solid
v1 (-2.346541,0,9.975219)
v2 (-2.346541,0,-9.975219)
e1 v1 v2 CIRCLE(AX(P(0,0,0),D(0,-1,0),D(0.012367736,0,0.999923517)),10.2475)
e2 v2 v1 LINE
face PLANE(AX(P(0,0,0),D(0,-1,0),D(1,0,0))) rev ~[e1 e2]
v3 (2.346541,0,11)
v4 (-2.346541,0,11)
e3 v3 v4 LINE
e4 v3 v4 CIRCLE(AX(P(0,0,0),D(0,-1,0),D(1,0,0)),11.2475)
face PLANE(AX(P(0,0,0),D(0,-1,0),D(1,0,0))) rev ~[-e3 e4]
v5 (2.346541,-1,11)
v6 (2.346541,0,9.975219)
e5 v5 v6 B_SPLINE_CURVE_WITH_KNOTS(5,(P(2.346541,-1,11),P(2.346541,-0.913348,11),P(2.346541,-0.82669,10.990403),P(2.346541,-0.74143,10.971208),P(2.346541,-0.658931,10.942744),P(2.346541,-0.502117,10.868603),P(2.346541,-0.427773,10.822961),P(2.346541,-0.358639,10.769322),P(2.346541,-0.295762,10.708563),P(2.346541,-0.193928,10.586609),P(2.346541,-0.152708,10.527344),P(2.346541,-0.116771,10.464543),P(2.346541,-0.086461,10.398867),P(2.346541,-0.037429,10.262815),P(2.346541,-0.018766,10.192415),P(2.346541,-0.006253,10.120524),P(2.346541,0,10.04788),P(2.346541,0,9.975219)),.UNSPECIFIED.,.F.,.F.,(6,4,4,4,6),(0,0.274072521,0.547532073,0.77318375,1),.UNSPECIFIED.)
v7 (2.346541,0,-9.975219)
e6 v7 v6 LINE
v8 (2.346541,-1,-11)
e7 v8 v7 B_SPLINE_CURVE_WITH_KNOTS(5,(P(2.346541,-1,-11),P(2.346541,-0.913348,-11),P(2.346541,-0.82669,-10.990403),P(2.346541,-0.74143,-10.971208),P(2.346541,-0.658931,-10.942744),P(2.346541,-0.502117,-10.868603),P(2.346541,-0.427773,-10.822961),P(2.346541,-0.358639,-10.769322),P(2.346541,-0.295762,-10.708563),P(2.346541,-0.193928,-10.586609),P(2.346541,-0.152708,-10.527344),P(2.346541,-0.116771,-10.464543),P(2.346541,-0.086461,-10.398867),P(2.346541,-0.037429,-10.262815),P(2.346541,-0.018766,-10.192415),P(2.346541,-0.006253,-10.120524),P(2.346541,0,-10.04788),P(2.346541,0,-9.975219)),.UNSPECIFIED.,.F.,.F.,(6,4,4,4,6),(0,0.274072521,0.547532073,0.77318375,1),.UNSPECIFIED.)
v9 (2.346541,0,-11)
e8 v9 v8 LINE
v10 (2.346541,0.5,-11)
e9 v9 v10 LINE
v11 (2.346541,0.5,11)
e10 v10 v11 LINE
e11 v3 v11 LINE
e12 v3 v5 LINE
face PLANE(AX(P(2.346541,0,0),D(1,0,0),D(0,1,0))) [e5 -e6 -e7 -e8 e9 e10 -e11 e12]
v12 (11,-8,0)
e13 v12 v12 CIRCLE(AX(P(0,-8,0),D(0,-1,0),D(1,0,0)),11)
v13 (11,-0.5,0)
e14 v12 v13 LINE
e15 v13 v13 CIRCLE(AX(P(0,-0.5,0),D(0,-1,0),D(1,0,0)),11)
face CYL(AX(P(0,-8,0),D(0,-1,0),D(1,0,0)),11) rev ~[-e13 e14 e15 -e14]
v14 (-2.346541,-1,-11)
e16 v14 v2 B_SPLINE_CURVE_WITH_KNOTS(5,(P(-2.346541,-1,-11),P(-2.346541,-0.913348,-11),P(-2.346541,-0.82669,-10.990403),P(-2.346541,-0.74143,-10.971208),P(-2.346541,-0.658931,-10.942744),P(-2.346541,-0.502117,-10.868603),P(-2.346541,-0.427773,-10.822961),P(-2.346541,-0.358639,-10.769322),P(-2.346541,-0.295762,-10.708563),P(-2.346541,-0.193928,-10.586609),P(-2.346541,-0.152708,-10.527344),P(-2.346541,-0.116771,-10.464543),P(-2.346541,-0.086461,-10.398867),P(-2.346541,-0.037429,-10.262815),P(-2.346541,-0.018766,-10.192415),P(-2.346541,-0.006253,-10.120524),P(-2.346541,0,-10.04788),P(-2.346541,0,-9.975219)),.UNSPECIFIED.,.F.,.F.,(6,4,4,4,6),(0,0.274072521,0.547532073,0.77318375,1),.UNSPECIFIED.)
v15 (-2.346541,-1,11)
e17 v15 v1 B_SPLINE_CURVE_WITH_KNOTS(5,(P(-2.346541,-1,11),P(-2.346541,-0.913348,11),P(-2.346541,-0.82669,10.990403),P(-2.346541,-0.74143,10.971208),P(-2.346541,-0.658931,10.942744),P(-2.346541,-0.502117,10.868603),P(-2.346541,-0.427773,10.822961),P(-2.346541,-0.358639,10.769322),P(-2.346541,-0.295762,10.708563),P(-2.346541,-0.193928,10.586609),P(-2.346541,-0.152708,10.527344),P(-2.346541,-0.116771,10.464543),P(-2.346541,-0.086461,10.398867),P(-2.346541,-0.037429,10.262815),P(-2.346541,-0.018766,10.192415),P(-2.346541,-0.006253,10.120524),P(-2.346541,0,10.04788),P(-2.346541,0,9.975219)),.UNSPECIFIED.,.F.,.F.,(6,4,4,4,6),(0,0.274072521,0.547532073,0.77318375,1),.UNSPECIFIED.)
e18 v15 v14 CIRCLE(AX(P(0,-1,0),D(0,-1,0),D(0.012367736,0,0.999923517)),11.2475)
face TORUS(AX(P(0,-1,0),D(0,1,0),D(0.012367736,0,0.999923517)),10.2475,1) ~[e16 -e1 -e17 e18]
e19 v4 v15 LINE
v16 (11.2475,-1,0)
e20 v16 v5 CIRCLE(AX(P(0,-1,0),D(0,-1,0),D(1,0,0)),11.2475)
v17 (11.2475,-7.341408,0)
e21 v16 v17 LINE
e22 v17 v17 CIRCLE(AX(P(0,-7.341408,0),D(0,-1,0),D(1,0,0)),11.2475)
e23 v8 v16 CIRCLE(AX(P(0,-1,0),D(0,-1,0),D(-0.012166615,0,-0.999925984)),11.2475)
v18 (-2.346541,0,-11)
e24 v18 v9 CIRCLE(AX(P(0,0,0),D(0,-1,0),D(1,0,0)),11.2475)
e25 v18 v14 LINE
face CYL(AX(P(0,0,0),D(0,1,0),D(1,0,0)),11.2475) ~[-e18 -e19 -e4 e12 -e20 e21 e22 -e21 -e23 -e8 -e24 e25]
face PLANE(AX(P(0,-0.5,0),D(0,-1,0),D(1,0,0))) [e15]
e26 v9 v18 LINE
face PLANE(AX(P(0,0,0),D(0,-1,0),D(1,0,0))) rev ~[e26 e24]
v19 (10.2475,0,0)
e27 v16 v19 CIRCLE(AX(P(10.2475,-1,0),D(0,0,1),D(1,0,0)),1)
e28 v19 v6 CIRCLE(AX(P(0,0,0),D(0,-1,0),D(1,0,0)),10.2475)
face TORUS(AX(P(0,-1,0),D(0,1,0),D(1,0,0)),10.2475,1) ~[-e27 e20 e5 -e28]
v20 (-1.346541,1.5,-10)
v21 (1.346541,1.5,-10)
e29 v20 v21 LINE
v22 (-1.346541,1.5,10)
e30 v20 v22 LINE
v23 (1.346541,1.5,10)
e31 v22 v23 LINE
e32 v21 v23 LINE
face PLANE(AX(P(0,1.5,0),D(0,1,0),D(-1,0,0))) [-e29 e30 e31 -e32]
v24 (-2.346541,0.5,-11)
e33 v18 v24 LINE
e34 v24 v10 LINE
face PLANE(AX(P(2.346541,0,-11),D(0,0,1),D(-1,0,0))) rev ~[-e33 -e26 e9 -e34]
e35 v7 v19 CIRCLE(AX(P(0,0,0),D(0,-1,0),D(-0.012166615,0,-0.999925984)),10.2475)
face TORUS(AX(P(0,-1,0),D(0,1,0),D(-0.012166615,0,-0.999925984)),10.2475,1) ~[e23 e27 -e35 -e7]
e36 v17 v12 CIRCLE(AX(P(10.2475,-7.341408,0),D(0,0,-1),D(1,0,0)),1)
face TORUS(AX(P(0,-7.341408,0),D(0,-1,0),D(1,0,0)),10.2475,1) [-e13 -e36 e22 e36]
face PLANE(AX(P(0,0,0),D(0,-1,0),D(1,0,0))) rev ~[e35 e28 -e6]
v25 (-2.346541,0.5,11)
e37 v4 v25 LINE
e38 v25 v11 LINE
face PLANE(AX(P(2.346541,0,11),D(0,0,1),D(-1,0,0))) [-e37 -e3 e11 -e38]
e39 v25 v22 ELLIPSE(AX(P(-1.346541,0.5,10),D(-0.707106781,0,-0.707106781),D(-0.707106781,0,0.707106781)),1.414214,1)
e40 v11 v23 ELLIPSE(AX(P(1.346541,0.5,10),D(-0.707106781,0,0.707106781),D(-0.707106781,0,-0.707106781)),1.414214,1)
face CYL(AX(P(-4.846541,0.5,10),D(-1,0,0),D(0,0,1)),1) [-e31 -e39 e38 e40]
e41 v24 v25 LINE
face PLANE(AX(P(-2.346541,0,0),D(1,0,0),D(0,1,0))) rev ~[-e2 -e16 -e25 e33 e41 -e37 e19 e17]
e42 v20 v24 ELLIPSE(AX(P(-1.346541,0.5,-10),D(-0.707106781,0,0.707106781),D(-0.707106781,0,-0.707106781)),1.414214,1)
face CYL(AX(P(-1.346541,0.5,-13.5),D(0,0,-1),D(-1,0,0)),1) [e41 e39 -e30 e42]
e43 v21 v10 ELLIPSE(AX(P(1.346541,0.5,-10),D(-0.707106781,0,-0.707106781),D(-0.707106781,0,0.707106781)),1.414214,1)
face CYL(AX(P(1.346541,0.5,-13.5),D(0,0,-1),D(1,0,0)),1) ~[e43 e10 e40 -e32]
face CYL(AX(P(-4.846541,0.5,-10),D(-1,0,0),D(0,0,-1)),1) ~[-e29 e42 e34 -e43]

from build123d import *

# Parameters (mm, degrees)
F0_R         = 11.2475
F1_DEPTH     = 8
F2_R         = 11
F3_DEPTH     = 7.5
F4_W         = 4.6930826756
F4_H         = 22
F5_DEPTH     = 1.5
F6_T1_DEPTH  = 9.6930826756
F6_T3_DEPTH  = 27
F6_T8_ANGLE  = 90.6971129065
F6_T13_ANGLE = 181.4172742502
F6_T18_ANGLE = 90.6971129065


# Not quite as in the source:
# - a fillet or chamfer that OpenCascade refuses, or shapes differently, is made with other operations: its cross-section is extruded or revolved along the edge and cut away or added


with BuildPart() as f1:
    # F0 (on Front) → F1 (new body)
    with BuildSketch(Plane.XZ):
        Circle(F0_R)
    extrude(amount=F1_DEPTH)

    # F2 (on face) → F3 (cut)
    with BuildSketch(Plane.XZ.offset(8)):
        Circle(F2_R)
    extrude(amount=-F3_DEPTH, mode=Mode.SUBTRACT)

    # F4 (on face) → F5 (join)
    with BuildSketch(Plane(origin=(0, 0, 0), x_dir=(-1, 0, 0), z_dir=(0, 1, 0))):
        Rectangle(F4_W, F4_H)
    extrude(amount=F5_DEPTH)

    # F6: fillet of radius 1 on 9 edges, made by hand

    # F6_s2 → F6_t1 (cut)
    with BuildSketch(Plane.YZ.offset(-4.8465413378)):
        with BuildLine():
            ThreePointArc((0.5, -11), (1.2071067812, -10.7071067812), (1.5, -10))
            Line((1.5, -10), (1.5, -11))
            Line((1.5, -11), (0.5, -11))
        make_face()
        with BuildLine():
            ThreePointArc((0.5, 11), (1.2071067812, 10.7071067812), (1.5, 10))
            Line((1.5, 10), (1.5, 11))
            Line((1.5, 11), (0.5, 11))
        make_face()
    extrude(amount=F6_T1_DEPTH, mode=Mode.SUBTRACT)

    # F6_s4 → F6_t3 (cut)
    with BuildSketch(Plane.XY.offset(-13.5)):
        with BuildLine():
            ThreePointArc((-2.3465413378, 0.5), (-2.053648119, 1.2071067812), (-1.3465413378, 1.5))
            Line((-1.3465413378, 1.5), (-2.3465413378, 1.5))
            Line((-2.3465413378, 1.5), (-2.3465413378, 0.5))
        make_face()
        with BuildLine():
            ThreePointArc((2.3465413378, 0.5), (2.053648119, 1.2071067812), (1.3465413378, 1.5))
            Line((1.3465413378, 1.5), (2.3465413378, 1.5))
            Line((2.3465413378, 1.5), (2.3465413378, 0.5))
        make_face()
    extrude(amount=F6_T3_DEPTH, mode=Mode.SUBTRACT)


with BuildPart() as f6_tool6:
    # F6_s7 → F6_t8 (revolve)
    with BuildSketch(Plane.XY):
        with BuildLine():
            ThreePointArc((11.2475, -1), (10.9546067812, -0.2928932188), (10.2475, 0))
            Line((10.2475, 0), (11.2475, 0))
            Line((11.2475, 0), (11.2475, -1))
        make_face()
    revolve(axis=Axis((0, 0, 0), (0, -1, 0)), revolution_arc=F6_T8_ANGLE)

    split(bisect_by=Plane.YZ.offset(2.3465413378), keep=Keep.TOP)


with BuildPart() as f1_1:
    add(f1.part)

    # F6_t5: cut F6_tool6
    add(f6_tool6.part, mode=Mode.SUBTRACT)


with BuildPart() as f6_tool11:
    # F6_s12 → F6_t13 (revolve)
    with BuildSketch(Plane(origin=(0, 0, 0), x_dir=(0, 1, 0), z_dir=(0.9999235166, 0, -0.0123677357))):
        with BuildLine():
            ThreePointArc((-1, 11.2475), (-0.2928932188, 10.9546067812), (0, 10.2475))
            Line((0, 10.2475), (0, 11.2475))
            Line((0, 11.2475), (-1, 11.2475))
        make_face()
    revolve(axis=Axis((0, 0, 0), (0, -1, 0)), revolution_arc=F6_T13_ANGLE)

    split(bisect_by=Plane.YZ.offset(-2.3465413378), keep=Keep.BOTTOM)


with BuildPart() as f1_2:
    add(f1_1.part)

    # F6_t10: cut F6_tool11
    add(f6_tool11.part, mode=Mode.SUBTRACT)


with BuildPart() as f6_tool16:
    # F6_s17 → F6_t18 (revolve)
    with BuildSketch(Plane(origin=(0, 0, 0), x_dir=(0, 1, 0), z_dir=(-0.999925984, 0, 0.0121666153))):
        with BuildLine():
            ThreePointArc((-1, 11.2475), (-0.2928932188, 10.9546067812), (0, 10.2475))
            Line((0, 10.2475), (0, 11.2475))
            Line((0, 11.2475), (-1, 11.2475))
        make_face()
    revolve(axis=Axis((0, 0, 0), (0, -1, 0)), revolution_arc=F6_T18_ANGLE)

    split(bisect_by=Plane.YZ.offset(2.3465413378), keep=Keep.TOP)


with BuildPart() as f1_3:
    add(f1_2.part)

    # F6_t15: cut F6_tool16
    add(f6_tool16.part, mode=Mode.SUBTRACT)

    # F6_s20 → F6_t21 (revolve, cut)
    with BuildSketch(Plane.XY):
        with BuildLine():
            ThreePointArc((11.2475, -7.3414077513), (11.1835822613, -7.6931889333), (11, -8))
            Line((11, -8), (11.2475, -8))
            Line((11.2475, -8), (11.2475, -7.3414077513))
        make_face()
    revolve(axis=Axis((0, -8, 0), (0, -1, 0)), mode=Mode.SUBTRACT)


solid = f1_3.part
